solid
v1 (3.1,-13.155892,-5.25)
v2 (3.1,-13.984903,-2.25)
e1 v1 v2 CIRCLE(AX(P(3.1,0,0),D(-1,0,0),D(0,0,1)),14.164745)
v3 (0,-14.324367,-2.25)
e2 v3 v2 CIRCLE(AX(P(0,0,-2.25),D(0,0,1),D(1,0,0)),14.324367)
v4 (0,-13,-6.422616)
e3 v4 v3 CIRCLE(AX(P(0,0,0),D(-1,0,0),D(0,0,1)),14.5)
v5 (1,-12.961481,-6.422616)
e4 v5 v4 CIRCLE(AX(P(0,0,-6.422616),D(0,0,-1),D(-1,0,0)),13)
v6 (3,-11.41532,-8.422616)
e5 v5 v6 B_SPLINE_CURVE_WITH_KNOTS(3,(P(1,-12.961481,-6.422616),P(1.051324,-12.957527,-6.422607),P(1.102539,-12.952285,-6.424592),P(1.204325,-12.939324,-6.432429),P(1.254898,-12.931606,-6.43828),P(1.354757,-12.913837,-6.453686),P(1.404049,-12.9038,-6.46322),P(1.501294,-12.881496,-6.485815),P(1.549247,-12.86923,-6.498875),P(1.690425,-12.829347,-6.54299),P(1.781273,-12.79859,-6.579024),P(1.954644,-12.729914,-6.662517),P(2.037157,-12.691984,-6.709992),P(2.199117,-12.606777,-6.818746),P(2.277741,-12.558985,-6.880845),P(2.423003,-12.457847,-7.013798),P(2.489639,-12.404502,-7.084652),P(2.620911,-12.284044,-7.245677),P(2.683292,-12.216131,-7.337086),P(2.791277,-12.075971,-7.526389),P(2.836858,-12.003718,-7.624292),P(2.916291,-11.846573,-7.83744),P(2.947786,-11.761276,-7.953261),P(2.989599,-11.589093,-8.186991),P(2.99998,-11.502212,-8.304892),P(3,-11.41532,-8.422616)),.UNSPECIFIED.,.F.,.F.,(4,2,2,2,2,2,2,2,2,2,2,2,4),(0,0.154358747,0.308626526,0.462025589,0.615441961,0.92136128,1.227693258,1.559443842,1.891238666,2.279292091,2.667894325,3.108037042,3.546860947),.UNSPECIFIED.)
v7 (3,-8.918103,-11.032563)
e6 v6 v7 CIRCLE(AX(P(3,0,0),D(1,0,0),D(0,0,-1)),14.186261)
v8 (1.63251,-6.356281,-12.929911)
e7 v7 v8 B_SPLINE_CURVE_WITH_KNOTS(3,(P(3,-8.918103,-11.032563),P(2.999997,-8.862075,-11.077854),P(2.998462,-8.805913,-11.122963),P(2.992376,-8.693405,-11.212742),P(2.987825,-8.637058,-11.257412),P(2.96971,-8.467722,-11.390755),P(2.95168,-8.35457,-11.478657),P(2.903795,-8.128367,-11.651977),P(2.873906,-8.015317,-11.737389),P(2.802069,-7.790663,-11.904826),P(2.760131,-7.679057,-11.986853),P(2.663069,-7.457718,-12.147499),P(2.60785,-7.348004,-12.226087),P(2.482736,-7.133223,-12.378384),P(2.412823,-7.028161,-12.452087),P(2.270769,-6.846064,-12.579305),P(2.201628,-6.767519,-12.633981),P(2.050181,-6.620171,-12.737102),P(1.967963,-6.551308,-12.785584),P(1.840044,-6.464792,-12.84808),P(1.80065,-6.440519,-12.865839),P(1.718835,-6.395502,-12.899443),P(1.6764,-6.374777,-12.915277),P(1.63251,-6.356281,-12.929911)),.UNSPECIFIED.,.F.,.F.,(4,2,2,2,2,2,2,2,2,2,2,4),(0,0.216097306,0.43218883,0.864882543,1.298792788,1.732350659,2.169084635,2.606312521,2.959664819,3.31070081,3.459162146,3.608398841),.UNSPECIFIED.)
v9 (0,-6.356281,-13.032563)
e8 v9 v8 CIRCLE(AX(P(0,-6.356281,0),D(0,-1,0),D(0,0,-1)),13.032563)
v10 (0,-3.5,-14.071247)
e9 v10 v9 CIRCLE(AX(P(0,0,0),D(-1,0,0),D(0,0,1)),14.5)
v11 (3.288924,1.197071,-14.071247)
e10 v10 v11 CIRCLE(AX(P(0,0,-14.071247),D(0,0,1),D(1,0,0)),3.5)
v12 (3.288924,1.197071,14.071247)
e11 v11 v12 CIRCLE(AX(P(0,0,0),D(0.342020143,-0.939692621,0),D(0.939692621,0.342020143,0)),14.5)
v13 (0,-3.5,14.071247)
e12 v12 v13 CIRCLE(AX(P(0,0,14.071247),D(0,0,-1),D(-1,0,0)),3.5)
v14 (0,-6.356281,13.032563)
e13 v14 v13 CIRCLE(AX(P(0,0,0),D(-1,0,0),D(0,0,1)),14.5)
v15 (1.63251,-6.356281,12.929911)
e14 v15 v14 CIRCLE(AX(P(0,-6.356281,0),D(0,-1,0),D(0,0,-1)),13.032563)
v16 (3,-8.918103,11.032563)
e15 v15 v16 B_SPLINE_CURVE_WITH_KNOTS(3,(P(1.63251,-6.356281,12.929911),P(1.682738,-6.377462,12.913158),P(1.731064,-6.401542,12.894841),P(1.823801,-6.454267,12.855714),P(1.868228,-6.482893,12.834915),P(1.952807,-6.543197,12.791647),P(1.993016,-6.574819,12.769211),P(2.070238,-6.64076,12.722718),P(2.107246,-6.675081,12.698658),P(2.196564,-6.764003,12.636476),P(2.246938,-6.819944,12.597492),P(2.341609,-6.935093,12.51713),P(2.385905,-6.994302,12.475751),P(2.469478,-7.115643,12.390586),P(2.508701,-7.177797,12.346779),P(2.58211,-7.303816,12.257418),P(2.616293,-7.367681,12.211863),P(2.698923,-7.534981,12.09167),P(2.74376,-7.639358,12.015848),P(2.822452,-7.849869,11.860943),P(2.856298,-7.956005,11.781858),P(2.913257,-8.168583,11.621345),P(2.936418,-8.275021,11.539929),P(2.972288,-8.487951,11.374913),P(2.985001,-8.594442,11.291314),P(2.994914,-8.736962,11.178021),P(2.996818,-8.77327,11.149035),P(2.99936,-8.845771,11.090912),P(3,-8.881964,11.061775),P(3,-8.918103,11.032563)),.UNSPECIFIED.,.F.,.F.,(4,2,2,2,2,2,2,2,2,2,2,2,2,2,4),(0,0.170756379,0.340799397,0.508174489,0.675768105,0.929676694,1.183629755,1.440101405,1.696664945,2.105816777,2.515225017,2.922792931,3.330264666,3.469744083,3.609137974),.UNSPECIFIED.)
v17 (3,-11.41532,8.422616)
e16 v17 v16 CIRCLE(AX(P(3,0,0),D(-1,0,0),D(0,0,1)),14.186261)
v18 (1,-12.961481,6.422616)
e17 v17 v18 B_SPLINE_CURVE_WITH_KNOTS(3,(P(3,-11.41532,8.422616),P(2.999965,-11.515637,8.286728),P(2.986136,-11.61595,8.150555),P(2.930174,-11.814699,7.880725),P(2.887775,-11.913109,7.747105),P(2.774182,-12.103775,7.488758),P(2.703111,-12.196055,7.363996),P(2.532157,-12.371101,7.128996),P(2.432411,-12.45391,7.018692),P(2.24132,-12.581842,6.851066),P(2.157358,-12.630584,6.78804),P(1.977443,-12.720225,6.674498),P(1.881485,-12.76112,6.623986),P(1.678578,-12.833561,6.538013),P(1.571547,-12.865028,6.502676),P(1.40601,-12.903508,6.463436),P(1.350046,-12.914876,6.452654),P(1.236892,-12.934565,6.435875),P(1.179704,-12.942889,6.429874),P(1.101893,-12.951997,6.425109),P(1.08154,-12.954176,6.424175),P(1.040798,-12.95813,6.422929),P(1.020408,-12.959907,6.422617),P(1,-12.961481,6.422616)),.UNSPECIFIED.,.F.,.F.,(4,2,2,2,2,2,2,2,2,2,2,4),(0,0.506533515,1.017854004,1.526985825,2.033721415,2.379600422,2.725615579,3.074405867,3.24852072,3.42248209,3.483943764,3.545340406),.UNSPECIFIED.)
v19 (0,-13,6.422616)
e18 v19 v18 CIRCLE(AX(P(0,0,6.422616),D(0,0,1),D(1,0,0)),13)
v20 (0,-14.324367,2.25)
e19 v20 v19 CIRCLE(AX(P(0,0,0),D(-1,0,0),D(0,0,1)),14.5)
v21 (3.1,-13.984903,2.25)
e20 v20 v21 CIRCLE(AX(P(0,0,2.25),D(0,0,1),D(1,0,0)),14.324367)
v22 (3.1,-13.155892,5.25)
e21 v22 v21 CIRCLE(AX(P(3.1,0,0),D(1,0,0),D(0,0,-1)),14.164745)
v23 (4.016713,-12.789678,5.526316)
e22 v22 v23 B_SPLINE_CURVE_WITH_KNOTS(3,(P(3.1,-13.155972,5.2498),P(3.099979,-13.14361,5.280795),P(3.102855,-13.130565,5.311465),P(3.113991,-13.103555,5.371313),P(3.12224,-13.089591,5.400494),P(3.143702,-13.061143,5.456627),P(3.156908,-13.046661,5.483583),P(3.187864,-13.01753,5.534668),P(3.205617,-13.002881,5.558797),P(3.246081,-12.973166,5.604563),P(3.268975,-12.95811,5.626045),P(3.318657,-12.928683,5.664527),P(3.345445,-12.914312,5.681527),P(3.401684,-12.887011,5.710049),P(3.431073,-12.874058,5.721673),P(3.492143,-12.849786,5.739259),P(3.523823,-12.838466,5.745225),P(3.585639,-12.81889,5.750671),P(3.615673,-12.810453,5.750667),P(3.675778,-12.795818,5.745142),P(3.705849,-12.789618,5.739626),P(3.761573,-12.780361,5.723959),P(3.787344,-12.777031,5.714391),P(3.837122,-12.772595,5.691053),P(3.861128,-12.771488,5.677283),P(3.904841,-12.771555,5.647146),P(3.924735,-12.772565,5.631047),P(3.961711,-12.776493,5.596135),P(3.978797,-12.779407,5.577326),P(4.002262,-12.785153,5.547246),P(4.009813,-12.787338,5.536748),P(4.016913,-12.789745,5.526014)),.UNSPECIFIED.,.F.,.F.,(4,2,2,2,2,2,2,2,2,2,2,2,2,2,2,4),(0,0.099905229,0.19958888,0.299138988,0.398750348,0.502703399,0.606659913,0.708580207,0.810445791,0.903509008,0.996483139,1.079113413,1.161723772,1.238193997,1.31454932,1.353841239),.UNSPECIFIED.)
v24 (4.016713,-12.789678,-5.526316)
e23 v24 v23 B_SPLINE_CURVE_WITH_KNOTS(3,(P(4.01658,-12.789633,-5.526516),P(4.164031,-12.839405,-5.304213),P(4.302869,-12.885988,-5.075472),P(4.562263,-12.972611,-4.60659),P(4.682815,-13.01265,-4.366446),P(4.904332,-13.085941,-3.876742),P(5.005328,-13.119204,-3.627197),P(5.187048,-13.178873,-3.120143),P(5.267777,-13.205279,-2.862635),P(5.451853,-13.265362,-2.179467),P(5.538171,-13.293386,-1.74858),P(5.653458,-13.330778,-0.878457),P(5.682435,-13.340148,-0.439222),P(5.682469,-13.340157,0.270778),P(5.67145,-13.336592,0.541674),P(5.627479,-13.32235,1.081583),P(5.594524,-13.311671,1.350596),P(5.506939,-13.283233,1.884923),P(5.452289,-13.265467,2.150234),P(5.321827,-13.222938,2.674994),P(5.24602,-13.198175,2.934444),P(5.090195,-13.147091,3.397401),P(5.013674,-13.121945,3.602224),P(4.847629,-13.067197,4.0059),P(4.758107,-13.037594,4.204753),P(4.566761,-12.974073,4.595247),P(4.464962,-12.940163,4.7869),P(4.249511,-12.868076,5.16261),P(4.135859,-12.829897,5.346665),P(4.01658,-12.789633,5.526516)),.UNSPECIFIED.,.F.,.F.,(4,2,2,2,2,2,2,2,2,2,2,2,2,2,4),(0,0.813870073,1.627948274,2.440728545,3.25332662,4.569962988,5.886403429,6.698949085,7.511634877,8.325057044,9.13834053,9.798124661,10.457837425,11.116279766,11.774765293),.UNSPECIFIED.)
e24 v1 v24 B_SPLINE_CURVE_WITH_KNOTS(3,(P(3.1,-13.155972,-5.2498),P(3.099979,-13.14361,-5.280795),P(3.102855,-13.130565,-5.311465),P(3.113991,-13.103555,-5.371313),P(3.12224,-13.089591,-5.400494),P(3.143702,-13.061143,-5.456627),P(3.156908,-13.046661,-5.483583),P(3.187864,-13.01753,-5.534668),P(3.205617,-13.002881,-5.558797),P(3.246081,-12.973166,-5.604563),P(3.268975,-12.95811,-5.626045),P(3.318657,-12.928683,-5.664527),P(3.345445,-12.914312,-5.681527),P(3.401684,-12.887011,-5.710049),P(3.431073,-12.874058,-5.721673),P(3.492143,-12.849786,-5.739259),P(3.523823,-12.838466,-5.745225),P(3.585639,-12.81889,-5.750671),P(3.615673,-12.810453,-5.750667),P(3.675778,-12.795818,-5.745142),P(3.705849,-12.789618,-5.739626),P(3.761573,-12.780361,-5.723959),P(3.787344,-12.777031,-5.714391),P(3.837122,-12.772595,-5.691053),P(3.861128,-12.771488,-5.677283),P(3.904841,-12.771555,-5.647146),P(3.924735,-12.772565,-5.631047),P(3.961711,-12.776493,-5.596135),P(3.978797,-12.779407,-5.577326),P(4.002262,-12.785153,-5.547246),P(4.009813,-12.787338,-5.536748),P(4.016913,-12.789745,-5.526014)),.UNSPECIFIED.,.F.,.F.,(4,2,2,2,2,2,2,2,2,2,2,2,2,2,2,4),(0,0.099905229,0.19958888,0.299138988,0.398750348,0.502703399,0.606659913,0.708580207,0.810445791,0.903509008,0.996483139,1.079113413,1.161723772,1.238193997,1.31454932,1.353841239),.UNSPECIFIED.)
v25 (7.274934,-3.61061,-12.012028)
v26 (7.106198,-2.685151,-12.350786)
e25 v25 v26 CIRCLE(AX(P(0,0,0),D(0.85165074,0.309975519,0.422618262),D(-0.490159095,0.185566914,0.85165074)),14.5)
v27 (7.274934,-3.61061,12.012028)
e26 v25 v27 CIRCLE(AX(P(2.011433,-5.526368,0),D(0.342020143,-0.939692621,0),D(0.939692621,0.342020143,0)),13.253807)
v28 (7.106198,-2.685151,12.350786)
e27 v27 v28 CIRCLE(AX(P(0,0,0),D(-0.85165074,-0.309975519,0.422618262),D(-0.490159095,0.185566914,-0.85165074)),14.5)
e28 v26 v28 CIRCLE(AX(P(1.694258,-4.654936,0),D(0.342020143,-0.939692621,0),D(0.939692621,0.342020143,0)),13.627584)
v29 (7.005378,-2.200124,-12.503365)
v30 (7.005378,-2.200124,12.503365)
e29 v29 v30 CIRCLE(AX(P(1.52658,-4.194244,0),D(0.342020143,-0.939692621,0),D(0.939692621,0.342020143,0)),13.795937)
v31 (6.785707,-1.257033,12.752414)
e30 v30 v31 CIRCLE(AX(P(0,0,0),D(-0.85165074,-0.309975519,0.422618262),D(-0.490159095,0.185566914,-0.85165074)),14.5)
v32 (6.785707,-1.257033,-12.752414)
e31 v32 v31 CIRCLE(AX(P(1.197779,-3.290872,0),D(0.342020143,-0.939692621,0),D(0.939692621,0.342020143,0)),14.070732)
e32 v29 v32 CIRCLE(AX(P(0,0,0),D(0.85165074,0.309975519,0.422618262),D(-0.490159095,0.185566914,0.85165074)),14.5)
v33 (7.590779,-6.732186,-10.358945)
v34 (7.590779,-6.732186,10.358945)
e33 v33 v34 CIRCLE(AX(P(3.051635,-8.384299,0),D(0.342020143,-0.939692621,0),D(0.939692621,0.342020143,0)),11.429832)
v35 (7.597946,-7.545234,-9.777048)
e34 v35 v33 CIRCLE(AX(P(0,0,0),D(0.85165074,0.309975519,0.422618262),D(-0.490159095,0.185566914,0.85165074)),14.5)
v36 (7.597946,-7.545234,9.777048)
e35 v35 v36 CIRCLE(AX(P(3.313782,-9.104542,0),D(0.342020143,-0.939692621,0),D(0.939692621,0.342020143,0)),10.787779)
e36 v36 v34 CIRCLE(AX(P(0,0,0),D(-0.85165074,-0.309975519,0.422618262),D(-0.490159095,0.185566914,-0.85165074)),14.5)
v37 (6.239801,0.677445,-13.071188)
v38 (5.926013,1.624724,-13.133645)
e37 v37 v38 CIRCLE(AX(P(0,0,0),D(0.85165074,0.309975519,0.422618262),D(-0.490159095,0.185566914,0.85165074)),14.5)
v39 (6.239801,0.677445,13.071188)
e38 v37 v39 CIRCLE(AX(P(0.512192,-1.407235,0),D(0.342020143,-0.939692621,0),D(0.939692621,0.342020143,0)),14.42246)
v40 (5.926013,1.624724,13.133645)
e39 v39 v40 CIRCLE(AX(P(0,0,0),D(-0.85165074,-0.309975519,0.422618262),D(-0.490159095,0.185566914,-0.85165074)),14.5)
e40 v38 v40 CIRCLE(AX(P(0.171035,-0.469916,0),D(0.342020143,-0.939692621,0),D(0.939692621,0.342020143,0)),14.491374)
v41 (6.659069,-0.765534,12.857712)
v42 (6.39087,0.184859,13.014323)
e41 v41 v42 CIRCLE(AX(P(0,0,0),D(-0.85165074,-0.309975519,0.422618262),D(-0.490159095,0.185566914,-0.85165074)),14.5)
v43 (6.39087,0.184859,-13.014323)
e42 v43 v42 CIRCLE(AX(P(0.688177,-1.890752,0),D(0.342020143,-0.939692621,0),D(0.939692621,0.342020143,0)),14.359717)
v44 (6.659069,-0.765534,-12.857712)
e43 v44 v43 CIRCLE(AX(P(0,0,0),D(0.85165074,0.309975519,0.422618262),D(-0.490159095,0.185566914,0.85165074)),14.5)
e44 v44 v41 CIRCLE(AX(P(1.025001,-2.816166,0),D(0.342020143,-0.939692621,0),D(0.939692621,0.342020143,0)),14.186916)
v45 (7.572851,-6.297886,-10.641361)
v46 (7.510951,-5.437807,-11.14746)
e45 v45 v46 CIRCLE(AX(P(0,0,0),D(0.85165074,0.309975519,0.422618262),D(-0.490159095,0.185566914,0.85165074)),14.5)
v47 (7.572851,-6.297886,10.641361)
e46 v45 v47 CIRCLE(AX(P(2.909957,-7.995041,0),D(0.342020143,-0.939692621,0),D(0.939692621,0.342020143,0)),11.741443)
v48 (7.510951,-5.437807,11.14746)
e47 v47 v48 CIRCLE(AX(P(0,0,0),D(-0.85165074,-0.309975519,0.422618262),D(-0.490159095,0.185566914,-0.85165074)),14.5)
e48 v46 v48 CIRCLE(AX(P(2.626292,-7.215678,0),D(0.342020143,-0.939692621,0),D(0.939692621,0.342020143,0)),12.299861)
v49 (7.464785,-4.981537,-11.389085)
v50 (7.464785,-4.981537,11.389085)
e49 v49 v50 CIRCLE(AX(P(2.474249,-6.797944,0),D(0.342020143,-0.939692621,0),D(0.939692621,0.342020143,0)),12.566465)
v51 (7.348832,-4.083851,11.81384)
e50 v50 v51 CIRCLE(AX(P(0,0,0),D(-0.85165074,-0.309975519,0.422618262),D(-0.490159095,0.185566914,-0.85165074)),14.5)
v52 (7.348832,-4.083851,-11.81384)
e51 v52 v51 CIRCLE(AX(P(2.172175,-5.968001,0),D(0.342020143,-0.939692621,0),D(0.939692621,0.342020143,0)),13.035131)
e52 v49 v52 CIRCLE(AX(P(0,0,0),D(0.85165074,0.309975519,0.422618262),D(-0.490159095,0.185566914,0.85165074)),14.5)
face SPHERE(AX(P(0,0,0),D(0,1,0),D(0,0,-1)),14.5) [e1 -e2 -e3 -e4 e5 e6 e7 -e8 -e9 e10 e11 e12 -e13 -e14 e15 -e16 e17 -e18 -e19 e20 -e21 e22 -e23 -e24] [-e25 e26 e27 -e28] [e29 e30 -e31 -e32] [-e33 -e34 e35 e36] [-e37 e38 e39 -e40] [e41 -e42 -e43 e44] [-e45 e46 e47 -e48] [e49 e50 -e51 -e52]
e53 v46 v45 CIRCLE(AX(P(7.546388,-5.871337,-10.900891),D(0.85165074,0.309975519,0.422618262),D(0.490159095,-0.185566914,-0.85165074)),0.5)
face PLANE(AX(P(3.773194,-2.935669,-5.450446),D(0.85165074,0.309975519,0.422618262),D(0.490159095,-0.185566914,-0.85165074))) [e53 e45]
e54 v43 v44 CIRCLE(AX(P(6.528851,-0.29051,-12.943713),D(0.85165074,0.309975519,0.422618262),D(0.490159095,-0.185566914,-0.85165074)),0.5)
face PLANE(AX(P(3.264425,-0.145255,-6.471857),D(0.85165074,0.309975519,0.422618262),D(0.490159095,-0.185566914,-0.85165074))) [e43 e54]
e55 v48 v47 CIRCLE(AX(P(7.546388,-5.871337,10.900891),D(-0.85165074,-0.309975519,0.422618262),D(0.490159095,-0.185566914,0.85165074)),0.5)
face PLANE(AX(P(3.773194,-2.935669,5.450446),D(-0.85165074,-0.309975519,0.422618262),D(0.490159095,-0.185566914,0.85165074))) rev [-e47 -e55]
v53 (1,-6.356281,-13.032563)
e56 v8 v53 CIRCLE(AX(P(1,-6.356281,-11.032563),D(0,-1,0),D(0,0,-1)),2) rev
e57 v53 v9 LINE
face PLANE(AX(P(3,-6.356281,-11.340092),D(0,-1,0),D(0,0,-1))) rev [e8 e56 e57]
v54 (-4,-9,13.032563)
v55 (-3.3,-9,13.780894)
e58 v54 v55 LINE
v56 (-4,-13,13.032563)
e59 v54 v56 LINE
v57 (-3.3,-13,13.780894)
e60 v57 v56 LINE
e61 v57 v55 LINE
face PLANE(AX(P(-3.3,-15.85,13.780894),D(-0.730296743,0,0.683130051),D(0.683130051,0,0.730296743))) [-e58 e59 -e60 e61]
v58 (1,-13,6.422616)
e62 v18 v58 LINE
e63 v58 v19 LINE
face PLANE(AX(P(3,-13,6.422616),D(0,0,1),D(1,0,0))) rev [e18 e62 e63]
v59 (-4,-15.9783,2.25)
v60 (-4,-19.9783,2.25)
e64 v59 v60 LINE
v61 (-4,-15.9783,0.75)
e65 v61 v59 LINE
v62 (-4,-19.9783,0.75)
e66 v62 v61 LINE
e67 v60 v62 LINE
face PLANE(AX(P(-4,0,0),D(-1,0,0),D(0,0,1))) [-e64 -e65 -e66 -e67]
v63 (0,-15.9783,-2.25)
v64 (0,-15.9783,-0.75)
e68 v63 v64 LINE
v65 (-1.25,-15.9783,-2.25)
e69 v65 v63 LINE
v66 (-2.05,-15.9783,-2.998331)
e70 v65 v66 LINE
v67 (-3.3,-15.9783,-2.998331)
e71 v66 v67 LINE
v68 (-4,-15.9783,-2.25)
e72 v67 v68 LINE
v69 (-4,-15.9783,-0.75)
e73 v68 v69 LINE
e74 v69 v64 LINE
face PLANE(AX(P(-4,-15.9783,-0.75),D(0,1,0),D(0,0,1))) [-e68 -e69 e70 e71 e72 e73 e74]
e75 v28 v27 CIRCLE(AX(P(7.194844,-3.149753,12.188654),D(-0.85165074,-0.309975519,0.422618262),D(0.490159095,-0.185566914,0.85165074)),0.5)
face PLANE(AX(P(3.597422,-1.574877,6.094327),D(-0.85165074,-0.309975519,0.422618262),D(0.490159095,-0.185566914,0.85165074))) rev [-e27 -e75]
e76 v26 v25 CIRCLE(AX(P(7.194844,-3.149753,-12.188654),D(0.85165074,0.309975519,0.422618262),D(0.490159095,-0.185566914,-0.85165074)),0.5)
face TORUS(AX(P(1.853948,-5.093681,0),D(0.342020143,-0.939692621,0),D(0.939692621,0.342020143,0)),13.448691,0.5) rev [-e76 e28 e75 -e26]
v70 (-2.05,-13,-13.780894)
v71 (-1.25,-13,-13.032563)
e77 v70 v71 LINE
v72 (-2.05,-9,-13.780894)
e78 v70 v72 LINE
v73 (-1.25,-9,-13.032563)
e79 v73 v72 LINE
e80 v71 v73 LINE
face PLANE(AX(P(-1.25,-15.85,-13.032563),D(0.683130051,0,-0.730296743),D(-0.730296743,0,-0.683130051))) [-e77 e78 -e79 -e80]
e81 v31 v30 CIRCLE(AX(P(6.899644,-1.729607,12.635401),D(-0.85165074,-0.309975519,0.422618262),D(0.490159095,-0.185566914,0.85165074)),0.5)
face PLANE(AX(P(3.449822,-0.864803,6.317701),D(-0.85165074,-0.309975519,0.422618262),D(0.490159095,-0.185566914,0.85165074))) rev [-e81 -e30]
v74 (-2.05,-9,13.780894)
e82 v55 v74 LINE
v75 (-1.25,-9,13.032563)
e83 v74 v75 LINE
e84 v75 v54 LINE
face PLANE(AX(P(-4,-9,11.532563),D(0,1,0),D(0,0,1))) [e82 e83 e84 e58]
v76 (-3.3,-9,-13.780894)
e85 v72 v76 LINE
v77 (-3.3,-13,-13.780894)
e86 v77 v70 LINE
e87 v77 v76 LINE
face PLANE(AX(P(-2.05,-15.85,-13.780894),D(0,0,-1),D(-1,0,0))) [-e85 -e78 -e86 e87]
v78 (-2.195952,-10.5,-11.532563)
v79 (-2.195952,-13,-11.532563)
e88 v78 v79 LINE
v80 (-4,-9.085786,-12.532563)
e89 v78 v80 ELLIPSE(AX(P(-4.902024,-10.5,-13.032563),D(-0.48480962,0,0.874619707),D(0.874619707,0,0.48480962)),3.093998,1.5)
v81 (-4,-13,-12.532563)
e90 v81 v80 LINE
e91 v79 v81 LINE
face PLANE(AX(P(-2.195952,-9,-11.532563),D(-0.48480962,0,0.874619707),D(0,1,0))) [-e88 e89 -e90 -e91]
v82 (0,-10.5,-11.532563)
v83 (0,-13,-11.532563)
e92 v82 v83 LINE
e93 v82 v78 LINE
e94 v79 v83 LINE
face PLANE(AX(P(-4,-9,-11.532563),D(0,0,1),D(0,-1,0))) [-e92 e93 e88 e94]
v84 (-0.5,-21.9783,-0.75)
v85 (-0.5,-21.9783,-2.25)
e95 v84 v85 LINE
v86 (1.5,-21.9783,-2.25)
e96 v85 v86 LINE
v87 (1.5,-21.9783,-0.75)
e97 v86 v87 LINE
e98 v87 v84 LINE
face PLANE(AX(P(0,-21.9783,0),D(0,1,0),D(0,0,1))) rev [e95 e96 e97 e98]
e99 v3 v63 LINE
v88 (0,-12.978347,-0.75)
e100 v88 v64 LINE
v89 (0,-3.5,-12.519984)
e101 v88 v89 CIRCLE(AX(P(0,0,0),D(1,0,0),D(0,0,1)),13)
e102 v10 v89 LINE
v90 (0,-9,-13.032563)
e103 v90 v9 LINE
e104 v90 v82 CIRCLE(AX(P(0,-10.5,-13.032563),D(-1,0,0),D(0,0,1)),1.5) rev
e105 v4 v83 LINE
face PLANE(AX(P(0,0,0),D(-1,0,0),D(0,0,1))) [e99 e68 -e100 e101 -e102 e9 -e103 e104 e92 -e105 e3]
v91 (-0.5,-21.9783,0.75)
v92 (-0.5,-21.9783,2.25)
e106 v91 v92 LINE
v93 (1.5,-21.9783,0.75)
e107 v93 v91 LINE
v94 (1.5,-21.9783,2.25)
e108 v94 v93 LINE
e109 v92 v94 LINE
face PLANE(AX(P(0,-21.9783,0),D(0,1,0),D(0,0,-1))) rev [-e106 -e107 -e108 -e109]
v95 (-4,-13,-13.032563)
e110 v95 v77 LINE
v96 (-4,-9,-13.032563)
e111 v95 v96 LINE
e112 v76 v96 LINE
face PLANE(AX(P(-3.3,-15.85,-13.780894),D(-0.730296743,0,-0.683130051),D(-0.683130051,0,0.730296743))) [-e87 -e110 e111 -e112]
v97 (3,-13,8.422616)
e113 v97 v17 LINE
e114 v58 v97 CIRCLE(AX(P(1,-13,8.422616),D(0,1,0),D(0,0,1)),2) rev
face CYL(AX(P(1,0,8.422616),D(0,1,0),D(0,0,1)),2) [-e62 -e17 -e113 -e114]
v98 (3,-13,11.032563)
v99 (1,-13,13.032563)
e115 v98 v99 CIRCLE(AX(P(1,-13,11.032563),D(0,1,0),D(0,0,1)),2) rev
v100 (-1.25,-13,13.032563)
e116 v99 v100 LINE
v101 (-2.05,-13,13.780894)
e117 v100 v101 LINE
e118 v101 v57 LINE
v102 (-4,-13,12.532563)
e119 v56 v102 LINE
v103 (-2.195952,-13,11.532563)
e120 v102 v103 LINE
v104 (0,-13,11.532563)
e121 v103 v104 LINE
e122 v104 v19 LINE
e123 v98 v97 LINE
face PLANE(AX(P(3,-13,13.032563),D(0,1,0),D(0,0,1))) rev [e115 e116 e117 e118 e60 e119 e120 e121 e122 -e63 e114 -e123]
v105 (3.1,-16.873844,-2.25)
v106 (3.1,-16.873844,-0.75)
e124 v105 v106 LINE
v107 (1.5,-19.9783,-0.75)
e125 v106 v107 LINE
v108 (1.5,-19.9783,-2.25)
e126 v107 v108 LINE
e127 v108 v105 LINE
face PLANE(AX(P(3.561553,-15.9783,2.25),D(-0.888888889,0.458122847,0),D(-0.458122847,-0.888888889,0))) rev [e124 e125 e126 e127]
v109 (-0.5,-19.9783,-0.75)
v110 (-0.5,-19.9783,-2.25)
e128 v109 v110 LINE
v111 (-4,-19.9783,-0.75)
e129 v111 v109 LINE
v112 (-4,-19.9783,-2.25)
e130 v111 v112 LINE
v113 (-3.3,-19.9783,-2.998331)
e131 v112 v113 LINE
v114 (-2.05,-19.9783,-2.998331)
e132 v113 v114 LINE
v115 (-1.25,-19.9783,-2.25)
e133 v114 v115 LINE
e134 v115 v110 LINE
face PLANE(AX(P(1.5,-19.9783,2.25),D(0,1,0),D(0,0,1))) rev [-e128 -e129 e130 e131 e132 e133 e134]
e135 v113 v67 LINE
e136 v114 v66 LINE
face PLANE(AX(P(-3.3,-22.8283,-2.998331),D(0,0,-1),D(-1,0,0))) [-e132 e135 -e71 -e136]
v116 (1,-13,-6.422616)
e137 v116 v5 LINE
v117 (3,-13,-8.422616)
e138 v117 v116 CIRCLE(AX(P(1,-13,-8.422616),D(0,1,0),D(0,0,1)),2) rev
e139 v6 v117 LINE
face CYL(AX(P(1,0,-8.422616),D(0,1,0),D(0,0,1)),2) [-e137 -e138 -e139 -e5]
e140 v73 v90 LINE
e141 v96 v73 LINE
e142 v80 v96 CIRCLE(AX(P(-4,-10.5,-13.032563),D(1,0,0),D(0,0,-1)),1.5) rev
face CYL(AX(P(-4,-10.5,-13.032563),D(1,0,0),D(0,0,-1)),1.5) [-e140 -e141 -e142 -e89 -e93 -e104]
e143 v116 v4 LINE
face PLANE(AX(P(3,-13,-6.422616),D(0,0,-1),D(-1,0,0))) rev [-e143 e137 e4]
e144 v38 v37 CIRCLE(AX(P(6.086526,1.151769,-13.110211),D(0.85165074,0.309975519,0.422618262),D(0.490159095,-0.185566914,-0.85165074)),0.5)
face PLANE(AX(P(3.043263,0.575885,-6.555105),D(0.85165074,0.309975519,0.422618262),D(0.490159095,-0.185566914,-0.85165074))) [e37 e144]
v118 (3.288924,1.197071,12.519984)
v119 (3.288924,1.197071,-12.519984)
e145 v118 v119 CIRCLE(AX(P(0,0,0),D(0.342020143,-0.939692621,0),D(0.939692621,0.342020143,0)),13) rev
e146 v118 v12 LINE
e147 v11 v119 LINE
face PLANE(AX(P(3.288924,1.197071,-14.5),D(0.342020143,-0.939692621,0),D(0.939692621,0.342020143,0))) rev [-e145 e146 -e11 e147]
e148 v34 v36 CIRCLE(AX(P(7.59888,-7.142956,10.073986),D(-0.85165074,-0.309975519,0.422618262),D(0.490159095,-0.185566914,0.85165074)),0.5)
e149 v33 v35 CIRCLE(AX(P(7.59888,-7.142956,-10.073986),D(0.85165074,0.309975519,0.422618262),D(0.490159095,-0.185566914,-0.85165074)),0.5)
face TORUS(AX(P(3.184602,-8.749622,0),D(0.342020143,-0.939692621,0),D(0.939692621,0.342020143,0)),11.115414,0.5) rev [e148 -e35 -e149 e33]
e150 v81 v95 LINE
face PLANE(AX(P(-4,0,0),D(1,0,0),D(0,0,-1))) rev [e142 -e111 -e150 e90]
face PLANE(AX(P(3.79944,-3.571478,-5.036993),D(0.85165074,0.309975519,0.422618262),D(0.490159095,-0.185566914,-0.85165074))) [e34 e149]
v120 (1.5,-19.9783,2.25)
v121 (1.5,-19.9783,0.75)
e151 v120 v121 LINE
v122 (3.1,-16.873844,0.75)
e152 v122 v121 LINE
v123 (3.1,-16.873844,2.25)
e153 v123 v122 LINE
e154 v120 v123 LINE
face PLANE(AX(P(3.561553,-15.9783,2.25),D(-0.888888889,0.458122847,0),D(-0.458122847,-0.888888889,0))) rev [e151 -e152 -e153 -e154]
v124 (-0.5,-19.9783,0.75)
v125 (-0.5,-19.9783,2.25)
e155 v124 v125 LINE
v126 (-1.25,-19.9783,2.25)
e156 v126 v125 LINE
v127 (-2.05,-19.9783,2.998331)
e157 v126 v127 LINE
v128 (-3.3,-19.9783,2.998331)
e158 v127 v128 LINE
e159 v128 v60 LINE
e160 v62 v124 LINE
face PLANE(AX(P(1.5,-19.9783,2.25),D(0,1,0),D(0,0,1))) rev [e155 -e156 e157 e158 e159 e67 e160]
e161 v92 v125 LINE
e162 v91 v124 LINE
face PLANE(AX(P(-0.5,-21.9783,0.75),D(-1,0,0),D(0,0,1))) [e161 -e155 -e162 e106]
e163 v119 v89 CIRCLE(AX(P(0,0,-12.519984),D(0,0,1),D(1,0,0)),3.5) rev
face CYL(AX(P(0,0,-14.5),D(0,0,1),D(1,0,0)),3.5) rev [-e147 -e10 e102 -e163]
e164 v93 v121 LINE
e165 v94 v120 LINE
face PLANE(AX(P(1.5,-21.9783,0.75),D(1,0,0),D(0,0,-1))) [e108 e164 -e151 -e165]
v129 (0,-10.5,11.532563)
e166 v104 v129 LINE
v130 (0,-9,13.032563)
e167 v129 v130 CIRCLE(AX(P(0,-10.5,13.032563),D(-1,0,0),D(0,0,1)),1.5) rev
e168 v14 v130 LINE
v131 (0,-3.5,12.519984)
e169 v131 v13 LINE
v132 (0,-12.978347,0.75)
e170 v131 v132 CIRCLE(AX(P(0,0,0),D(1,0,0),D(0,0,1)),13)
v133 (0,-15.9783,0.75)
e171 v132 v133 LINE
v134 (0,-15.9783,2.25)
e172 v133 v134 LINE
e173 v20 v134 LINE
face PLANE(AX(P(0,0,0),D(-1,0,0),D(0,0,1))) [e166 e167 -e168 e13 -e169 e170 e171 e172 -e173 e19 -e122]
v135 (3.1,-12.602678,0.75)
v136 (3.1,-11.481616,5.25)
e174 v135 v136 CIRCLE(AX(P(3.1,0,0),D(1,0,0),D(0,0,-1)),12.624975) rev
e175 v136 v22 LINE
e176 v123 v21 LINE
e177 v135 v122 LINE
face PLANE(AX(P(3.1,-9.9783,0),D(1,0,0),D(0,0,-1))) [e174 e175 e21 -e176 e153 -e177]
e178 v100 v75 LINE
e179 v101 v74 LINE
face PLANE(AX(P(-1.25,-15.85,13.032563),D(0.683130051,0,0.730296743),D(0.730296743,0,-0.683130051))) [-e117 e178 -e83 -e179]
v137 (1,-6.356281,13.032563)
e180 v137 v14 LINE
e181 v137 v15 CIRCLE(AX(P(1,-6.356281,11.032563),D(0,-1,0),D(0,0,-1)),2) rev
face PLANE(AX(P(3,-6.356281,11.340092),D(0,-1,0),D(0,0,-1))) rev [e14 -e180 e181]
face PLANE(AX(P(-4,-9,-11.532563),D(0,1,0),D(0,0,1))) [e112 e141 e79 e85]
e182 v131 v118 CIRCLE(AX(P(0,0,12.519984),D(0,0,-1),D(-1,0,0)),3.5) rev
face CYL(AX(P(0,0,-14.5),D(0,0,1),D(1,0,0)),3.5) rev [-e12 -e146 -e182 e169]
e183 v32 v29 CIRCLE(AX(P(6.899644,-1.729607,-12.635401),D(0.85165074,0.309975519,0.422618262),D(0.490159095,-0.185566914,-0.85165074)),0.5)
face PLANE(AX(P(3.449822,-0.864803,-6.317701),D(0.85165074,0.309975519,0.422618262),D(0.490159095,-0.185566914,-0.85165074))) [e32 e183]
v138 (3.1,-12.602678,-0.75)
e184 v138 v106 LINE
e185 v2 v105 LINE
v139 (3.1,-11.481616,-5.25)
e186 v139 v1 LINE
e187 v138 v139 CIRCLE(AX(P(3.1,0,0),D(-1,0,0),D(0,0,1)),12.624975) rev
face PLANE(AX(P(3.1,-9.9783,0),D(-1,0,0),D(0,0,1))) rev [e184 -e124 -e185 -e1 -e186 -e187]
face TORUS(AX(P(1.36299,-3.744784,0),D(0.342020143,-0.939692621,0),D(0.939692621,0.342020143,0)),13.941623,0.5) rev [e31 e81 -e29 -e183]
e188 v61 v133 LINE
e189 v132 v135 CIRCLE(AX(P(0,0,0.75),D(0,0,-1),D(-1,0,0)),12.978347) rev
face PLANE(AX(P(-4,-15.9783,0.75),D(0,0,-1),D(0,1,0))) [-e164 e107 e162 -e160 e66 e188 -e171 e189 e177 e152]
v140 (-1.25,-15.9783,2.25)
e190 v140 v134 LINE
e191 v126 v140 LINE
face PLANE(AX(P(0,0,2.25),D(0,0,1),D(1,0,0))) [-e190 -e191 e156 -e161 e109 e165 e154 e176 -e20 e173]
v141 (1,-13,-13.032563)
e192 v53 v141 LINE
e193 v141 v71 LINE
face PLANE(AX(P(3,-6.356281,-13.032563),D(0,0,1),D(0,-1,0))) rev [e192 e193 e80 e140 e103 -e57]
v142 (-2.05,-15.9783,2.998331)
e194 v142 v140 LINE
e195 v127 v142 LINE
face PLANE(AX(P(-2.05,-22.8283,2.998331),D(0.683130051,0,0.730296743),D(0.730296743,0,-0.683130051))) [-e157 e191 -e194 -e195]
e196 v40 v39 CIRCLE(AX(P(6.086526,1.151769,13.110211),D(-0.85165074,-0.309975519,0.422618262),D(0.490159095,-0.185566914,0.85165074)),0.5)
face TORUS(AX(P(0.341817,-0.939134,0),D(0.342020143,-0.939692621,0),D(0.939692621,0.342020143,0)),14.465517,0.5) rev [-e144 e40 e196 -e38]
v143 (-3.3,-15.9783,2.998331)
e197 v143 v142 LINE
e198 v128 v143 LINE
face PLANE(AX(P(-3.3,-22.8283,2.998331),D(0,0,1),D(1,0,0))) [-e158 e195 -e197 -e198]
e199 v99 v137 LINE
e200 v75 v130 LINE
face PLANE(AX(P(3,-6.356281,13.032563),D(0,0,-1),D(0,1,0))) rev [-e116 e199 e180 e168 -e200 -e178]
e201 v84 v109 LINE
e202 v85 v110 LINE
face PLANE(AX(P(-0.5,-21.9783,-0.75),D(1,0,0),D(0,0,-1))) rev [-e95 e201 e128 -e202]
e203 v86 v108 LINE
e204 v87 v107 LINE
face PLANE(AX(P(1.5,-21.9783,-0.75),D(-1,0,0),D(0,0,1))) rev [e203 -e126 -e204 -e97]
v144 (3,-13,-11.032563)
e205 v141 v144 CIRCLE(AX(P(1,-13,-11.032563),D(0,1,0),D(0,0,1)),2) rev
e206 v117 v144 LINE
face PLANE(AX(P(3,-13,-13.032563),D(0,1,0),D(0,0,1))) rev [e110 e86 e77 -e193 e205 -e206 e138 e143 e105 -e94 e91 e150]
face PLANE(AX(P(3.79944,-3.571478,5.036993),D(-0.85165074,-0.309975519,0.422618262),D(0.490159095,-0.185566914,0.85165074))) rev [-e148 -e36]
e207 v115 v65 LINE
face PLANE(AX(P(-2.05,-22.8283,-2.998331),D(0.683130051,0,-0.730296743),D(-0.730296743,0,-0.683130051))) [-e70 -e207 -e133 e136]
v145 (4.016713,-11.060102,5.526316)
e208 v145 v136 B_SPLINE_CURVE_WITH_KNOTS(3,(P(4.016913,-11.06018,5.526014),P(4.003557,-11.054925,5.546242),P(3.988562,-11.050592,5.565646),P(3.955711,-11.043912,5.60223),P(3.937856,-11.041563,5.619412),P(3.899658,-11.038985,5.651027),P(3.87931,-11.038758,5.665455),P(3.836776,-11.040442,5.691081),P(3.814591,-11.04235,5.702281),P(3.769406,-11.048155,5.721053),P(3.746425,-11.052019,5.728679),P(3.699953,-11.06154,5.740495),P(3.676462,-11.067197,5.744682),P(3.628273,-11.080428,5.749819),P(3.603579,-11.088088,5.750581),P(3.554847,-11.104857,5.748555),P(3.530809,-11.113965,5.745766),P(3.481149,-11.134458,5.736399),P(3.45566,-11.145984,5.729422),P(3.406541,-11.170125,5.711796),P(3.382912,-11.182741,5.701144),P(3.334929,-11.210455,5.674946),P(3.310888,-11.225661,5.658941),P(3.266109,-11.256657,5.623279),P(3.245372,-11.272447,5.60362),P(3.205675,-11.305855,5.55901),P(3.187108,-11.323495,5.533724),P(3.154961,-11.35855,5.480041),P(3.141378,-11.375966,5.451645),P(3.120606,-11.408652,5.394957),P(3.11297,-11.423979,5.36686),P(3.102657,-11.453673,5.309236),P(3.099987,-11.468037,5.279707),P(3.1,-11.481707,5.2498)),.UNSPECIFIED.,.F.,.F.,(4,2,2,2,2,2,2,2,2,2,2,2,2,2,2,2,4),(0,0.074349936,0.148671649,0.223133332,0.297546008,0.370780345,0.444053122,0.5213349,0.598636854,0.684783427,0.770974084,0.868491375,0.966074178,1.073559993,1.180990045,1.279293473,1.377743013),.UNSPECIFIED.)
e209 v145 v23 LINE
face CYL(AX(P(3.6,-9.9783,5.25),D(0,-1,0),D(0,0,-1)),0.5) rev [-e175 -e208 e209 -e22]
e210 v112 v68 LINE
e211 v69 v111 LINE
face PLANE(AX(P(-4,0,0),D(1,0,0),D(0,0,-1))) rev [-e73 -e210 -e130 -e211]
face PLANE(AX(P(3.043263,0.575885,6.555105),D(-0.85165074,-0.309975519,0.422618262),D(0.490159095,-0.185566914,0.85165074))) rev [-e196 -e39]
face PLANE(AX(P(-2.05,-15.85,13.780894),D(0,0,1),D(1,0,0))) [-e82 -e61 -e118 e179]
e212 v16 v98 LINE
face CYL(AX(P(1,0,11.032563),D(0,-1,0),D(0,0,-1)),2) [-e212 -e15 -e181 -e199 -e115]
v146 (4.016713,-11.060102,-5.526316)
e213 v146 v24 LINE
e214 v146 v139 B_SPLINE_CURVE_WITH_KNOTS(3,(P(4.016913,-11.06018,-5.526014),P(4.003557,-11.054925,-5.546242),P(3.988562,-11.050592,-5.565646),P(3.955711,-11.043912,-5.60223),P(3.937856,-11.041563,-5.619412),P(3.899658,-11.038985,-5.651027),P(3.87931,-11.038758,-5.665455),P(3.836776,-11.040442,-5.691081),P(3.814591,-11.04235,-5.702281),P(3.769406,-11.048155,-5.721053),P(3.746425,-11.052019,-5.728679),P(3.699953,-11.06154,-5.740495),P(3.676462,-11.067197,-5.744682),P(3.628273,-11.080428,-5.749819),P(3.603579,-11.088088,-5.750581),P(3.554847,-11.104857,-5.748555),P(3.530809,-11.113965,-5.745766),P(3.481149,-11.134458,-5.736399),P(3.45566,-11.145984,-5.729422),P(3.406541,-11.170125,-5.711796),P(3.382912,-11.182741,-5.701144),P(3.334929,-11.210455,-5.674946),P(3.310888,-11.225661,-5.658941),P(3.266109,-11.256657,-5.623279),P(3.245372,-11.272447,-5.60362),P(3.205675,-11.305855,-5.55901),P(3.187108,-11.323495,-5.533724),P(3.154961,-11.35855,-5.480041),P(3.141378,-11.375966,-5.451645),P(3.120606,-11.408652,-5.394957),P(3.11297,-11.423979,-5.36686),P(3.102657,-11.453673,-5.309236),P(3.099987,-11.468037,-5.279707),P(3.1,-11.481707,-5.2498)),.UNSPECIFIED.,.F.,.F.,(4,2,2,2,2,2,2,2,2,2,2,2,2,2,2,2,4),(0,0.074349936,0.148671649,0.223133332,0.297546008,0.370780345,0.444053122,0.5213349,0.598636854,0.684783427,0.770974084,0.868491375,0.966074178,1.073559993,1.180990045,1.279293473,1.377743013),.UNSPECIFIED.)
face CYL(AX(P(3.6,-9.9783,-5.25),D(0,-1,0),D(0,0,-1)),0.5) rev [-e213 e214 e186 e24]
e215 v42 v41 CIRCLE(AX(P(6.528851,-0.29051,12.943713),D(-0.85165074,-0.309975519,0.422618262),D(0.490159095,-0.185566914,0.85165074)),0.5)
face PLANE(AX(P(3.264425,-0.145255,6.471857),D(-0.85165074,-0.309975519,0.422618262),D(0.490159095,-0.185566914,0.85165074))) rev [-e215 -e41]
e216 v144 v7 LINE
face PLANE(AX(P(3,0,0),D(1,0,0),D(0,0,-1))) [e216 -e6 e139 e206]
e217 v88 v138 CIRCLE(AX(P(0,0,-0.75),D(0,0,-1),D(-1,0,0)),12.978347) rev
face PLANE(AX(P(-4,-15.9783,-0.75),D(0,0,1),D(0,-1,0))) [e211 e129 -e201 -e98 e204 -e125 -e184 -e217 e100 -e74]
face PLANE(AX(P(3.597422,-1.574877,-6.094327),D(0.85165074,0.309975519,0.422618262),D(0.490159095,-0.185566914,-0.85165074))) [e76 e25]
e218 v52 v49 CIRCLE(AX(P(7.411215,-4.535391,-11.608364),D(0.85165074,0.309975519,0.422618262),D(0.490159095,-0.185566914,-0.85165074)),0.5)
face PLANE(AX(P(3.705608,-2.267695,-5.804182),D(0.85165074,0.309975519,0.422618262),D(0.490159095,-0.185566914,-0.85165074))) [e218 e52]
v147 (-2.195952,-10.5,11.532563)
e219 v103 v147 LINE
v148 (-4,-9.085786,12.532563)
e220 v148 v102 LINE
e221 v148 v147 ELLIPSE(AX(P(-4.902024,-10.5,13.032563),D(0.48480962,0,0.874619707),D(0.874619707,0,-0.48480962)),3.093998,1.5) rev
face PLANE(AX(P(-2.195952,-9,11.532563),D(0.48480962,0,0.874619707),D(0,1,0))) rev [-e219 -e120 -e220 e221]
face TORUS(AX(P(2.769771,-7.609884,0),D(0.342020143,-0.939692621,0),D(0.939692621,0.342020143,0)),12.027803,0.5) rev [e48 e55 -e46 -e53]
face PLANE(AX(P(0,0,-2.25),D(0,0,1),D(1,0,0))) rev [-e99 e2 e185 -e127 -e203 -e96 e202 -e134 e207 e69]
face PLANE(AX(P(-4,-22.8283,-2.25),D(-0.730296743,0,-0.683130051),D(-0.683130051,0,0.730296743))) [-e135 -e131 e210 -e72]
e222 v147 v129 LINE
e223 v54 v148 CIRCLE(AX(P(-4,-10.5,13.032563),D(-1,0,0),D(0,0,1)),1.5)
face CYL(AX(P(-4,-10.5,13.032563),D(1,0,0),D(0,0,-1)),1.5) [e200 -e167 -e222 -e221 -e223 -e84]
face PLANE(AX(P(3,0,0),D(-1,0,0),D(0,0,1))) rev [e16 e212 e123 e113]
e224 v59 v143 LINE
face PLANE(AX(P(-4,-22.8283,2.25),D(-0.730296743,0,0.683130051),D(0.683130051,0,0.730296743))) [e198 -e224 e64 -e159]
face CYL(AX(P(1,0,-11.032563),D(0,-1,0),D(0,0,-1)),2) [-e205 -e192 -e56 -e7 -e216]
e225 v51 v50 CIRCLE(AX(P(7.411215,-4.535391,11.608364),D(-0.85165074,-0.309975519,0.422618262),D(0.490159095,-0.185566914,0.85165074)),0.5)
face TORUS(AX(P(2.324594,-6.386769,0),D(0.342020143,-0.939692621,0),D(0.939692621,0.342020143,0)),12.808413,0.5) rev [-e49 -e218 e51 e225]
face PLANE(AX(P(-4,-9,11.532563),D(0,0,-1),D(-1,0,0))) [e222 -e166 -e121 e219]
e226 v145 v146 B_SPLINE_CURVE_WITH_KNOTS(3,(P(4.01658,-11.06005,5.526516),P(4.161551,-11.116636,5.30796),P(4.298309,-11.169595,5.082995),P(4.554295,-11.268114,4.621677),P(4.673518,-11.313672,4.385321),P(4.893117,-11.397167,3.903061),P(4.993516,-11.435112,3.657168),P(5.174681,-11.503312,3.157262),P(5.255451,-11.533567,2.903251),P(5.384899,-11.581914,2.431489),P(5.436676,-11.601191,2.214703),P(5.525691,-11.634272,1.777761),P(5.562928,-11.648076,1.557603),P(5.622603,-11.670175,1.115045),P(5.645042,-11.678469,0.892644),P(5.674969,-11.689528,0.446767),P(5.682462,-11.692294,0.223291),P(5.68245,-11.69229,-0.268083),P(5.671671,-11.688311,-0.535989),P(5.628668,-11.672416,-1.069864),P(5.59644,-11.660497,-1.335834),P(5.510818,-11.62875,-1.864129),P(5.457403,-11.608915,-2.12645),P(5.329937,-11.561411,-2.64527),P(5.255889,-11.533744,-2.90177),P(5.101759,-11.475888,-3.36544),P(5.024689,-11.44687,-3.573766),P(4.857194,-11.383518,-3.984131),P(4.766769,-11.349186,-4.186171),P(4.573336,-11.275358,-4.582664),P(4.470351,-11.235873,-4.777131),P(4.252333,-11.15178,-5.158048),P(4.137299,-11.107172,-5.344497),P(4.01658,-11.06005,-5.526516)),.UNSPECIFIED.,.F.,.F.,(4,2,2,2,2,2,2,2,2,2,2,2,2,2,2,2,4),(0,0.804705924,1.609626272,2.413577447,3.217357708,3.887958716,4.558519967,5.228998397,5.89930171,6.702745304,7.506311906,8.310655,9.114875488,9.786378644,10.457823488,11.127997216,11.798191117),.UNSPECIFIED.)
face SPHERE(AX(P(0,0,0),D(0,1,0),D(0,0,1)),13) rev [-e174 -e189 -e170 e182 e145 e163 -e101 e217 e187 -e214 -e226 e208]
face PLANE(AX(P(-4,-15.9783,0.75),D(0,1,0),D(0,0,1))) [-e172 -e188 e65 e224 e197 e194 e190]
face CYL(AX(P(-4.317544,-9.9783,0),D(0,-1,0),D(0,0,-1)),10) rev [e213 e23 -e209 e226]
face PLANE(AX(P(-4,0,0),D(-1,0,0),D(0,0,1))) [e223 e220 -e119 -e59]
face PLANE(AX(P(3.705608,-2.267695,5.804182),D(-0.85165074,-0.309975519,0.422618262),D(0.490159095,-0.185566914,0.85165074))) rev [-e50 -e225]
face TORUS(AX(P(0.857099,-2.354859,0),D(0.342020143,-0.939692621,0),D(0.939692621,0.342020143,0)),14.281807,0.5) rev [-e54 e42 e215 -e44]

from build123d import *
from OCP.BRepFilletAPI import BRepFilletAPI_MakeChamfer

# Parameters (mm, degrees)
CUT_EXTRUDE1_DEPTH      = 26.114736710152698
CUT_EXTRUDE1_DEPTH_BACK = 26.114736710152698
BOSS_EXTRUDE1_DEPTH     = 4
BOSS_EXTRUDE1_2_DEPTH   = 4
BOSS_EXTRUDE1_3_DEPTH   = 4
BOSS_EXTRUDE1_4_DEPTH   = 4
BOSS_EXTRUDE2_DEPTH     = 2.25
BOSS_EXTRUDE3_DEPTH     = 3
BOSS_EXTRUDE4_DEPTH     = 4
BOSS_EXTRUDE5_DEPTH     = 4
CHAMFER1_SIZE           = 1
CHAMFER1_SIZE2          = 1.8040477552714331
FILLET1_R               = 2
FILLET2_R               = 2
FILLET3_R               = 1.5
CUT_EXTRUDE3_DEPTH      = 10
CUT_REVOLVE1_ANGLE      = 130.00000000000045
BOSS_EXTRUDE6_DEPTH     = 2


# Read off the part's stored shape, not the designer's step: Revolve1
with BuildPart() as part:
    # Revolve1 outline → Revolve1 (revolve)
    with BuildSketch(Plane.YX):
        with BuildLine():
            Line((13, -1.3e-08), (14.5, -1.1e-08))
            ThreePointArc((14.5, -1.1e-08), (10.253048331, 10.253048323), (0, 14.5))
            Line((0, 14.5), (0, 13))
            ThreePointArc((0, 13), (9.19238816, 9.192388151), (13, -1.3e-08))
        make_face()
    revolve(axis=Axis((0, 0, 0), (1, 0, 0)))

    # Sketch7 → Cut-Extrude1 (cut, two sides: drawn at the far end of the back side and taken through both)
    with BuildSketch(Plane.XY.offset(-CUT_EXTRUDE1_DEPTH_BACK)):
        with BuildLine():
            Line((3.288924172750674, 1.1970705016398546), (13.625543001395652, 4.959292078222255))
            ThreePointArc((13.625543001395652, 4.959292078222255), (8.316858327090143, 11.877704642190398), (-1.76e-15, 14.5))
            Line((-1.76e-15, 14.5), (-1.79e-15, -3.04e-15))
            Line((-1.79e-15, -3.04e-15), (-1.58e-15, -3.5))
            ThreePointArc((-1.58e-15, -3.5), (2.867032155011472, -2.0075175272286554), (3.288924172750674, 1.1970705016398546))
        make_face()
    extrude(amount=CUT_EXTRUDE1_DEPTH + CUT_EXTRUDE1_DEPTH_BACK, mode=Mode.SUBTRACT)



with BuildPart() as body_2:
    # Sketch2 → Boss-Extrude1 (new body)
    with BuildSketch(Plane(origin=(0, 0, 0), x_dir=(0, 0, -1), z_dir=(1, 0, 0))):
        Polygon((0.7500000000000001, -15.9783), (2.2499999999999996, -15.9783), (2.2500000000000013, -19.9783), (0.7500000000000009, -19.9783), align=None)
    extrude(amount=-BOSS_EXTRUDE1_DEPTH)


with BuildPart() as body_3:
    # Sketch2 → Boss-Extrude1 2 (new body)
    with BuildSketch(Plane(origin=(0, 0, 0), x_dir=(0, 0, -1), z_dir=(1, 0, 0))):
        Polygon((-0.75, -15.9783), (-2.2499999999999996, -15.9783), (-2.2499999999999996, -19.9783), (-0.7499999999999993, -19.9783), align=None)
    extrude(amount=-BOSS_EXTRUDE1_2_DEPTH)


with BuildPart() as body_4:
    # Sketch2 → Boss-Extrude1 3 (new body)
    with BuildSketch(Plane(origin=(0, 0, 0), x_dir=(0, 0, -1), z_dir=(1, 0, 0))):
        Polygon((-11.532562594670793, -9.000000000000002), (-13.032562594670793, -9.000000000000002), (-13.032562594670793, -13.000000000000004), (-11.532562594670793, -13.000000000000002), align=None)
    extrude(amount=-BOSS_EXTRUDE1_3_DEPTH)


with BuildPart() as body_5:
    # Sketch2 → Boss-Extrude1 4 (new body)
    with BuildSketch(Plane(origin=(0, 0, 0), x_dir=(0, 0, -1), z_dir=(1, 0, 0))):
        Polygon((11.532562594670795, -9.000000000000002), (13.032562594670791, -9.000000000000002), (13.032562594670791, -13.000000000000002), (11.532562594670791, -13.000000000000002), align=None)
    extrude(amount=-BOSS_EXTRUDE1_4_DEPTH)


with BuildPart() as part_1:
    add(part.part)

    add(body_2.part)  # Boss-Extrude2 merges body 2

    add(body_3.part)  # Boss-Extrude2 merges body 3
    # Sketch3 → Boss-Extrude2 (add, symmetric)
    with BuildSketch(Plane.XY):
        Polygon((3.5615528128088356, -15.978300000000004), (1.5, -19.9783), (0, -19.9783), (0, -15.9783), (-2.39e-15, -13), (3.5615528128088223, -13), align=None)
    extrude(amount=BOSS_EXTRUDE2_DEPTH, both=True)


    add(body_4.part)  # Boss-Extrude3 merges body 4

    add(body_5.part)  # Boss-Extrude3 merges body 5
    # Sketch4 → Boss-Extrude3 (add)
    with BuildSketch(Plane(origin=(0, 0, 0), x_dir=(0, 0, -1), z_dir=(1, 0, 0))):
        with BuildLine():
            Line((-6.4226162893325585, -13.000000000000004), (-6.4226162893325585, -11.302654555457316))
            ThreePointArc((-6.4226162893325585, -11.302654555457316), (-9.219278928727187, -9.165418486590061), (-11.340092053595173, -6.356281319764543))
            Line((-11.340092053595173, -6.356281319764543), (-13.032562594670793, -6.356281319764542))
            Line((-13.032562594670793, -6.356281319764542), (-13.032562594670791, -13.000000000000002))
            Line((-13.032562594670791, -13.000000000000002), (-6.4226162893325585, -13.000000000000004))
        make_face()
        with BuildLine():
            Line((11.340092053595173, -6.356281319764543), (13.032562594670793, -6.356281319764542))
            Line((13.032562594670793, -6.356281319764542), (13.032562594670791, -13.000000000000002))
            Line((13.032562594670791, -13.000000000000002), (6.4226162893325585, -13.000000000000004))
            Line((6.4226162893325585, -13.000000000000004), (6.4226162893325585, -11.302654555457316))
            ThreePointArc((6.4226162893325585, -11.302654555457316), (9.219278928727183, -9.165418486590065), (11.340092053595173, -6.356281319764543))
        make_face()
    extrude(amount=BOSS_EXTRUDE3_DEPTH)

    # Sketch5 → Boss-Extrude4 (add)
    with BuildSketch(Plane(origin=(0, -15.9783, 0), x_dir=(1, 0, 0), z_dir=(0, 1, 0))):
        Polygon((-4, -2.25), (-3.3, -2.9983314773547876), (-2.0499999999999963, -2.998331477354794), (-1.250000000000001, -2.2499999999999996), align=None)
        Polygon((-2.0499999999999963, 2.9983314773547933), (-1.250000000000001, 2.2499999999999996), (-4, 2.25), (-3.3000000000000007, 2.9983314773547867), align=None)
    extrude(amount=-BOSS_EXTRUDE4_DEPTH)

    # Sketch6 → Boss-Extrude5 (add)
    with BuildSketch(Plane(origin=(0, -9.000000000000002, 0), x_dir=(1, 0, 0), z_dir=(0, 1, 0))):
        Polygon((-1.2500000000000016, -13.032562594670793), (-2.05, -13.780894072025584), (-3.3000000000000034, -13.780894072025584), (-4, -13.032562594670795), align=None)
        Polygon((-1.2500000000000049, 13.032562594670793), (-2.0500000000000034, 13.780894072025584), (-3.300000000000007, 13.780894072025584), (-4, 13.032562594670795), align=None)
    extrude(amount=-BOSS_EXTRUDE5_DEPTH)

    # Chamfer1: one chamfer whose edges measure the first distance from different faces: ONE call of the kernel's chamfer builder (chamfer() names one face for all edges)
    chamfer1_edges_1 = [part_1.edges().sort_by_distance(p)[0] for p in [
        (-4, -11.000000000000002, 11.532562594670793),
    ]]
    chamfer1_side_1 = [part_1.faces().sort_by_distance(p)[0] for p in [
        (-4, -11.000000000000002, 12.282562594670795),
    ]]
    chamfer1_edges_2 = [part_1.edges().sort_by_distance(p)[0] for p in [
        (-4, -11.000000000000002, -11.532562594670793),
    ]]
    chamfer1_side_2 = [part_1.faces().sort_by_distance(p)[0] for p in [
        (-4, -11.000000000000004, -12.282562594670793),
    ]]
    chamfer1 = BRepFilletAPI_MakeChamfer(part_1.part.solid().wrapped)
    for e in chamfer1_edges_1:
        chamfer1.Add(CHAMFER1_SIZE, CHAMFER1_SIZE2, e.wrapped, chamfer1_side_1[0].wrapped)  # the first distance lies on this face
    for e in chamfer1_edges_2:
        chamfer1.Add(CHAMFER1_SIZE, CHAMFER1_SIZE2, e.wrapped, chamfer1_side_2[0].wrapped)  # the first distance lies on this face
    add(Compound.cast(chamfer1.Shape()), mode=Mode.REPLACE)

    # Fillet1
    fillet1_edges = [part_1.edges().sort_by_distance(p)[0] for p in [
        (3, -9.678140659882272, -13.032562594670793),
        (3, -9.678140659882272, 13.032562594670793),
    ]]
    fillet(fillet1_edges, radius=FILLET1_R)

    # Fillet2
    fillet2_edges = [part_1.edges().sort_by_distance(p)[0] for p in [
        (3, -12.824555321004684, -6.4226162893325585),
        (3, -12.824555321004684, 6.4226162893325585),
    ]]
    fillet(fillet2_edges, radius=FILLET2_R)

    # Fillet3
    fillet3_edges = [part_1.edges().sort_by_distance(p)[0] for p in [
        (-1.0979761223642828, -9.000000000000002, 11.532562594670793),
        (-1.097976122364282, -9.000000000000002, -11.532562594670795),
    ]]
    fillet(fillet3_edges, radius=FILLET3_R)

    # Sketch8 → Cut-Extrude3 (cut)
    with BuildSketch(Plane.XZ.offset(19.9783)):
        with BuildLine():
            Line((0, 0.7499999999999994), (3.1, 0.749999999999999))
            Line((3.1, 0.749999999999999), (3.0999999999999996, 5.25))
            ThreePointArc((3.0999999999999996, 5.25), (3.455702418732044, 5.728725608297927), (4.016712832160874, 5.526315789473686))
            ThreePointArc((4.016712832160874, 5.526315789473686), (5.256968354901936, 2.885951625359105), (5.682456188943444, 1e-17))
            Line((5.682456188943444, 1e-17), (0, 0))
            Line((0, 0), (0, 0.7499999999999994))
        make_face()
    cut_extrude3 = extrude(amount=-CUT_EXTRUDE3_DEPTH, mode=Mode.SUBTRACT)

    # Mirror1: Cut-Extrude3 across plane
    add(cut_extrude3.mirror(Plane.XY), mode=Mode.SUBTRACT)

    # Sketch9 → Cut-Revolve1 (revolve, symmetric, cut)
    with BuildSketch(Plane.XY) as cut_revolve1_sk:
        with BuildLine():
            ThreePointArc((13.788472874762384, 4.48642572455422), (13.93495654907324, 4.008364501319799), (14.06487071500232, 3.525537089617696))
            ThreePointArc((14.06487071500232, 3.525537089617696), (13.454440806001752, 3.870145035757048), (13.788472874762384, 4.48642572455422))
        make_face()
        with BuildLine():
            ThreePointArc((14.181897364194834, 3.020560734606002), (14.277607580598435, 2.529806667403268), (14.356340855764694, 2.0360445066602195))
            ThreePointArc((14.356340855764694, 2.0360445066602195), (13.785276284715724, 2.4425719547342415), (14.181897364194834, 3.020560734606002))
        make_face()
        with BuildLine():
            ThreePointArc((14.419942018352346, 1.5216018491564718), (14.463830155689108, 1.023531742242686), (14.490519921853823, 0.5242445940182665))
            ThreePointArc((14.490519921853823, 0.5242445940182665), (13.965077391699829, 0.9882375442343183), (14.419942018352346, 1.5216018491564718))
        make_face()
        with BuildLine():
            ThreePointArc((14.499998770189928, 0.00597197543192492), (14.49158398084301, -0.49395721087374367), (14.465937819342894, -0.9932990521010843))
            ThreePointArc((14.465937819342894, -0.9932990521010843), (13.99187418840015, -0.47692420360223536), (14.499998770189928, 0.00597197543192492))
        make_face()
        with BuildLine():
            ThreePointArc((14.421190501181444, -1.509723328505564), (14.360564979343833, -2.0060342654210404), (14.282863874891065, -2.4999599059448148))
            ThreePointArc((14.282863874891065, -2.4999599059448148), (13.865373083504398, -1.9368606700616913), (14.421190501181444, -1.509723328505564))
        make_face()
        with BuildLine():
            ThreePointArc((14.184380651213877, -3.00887778772573), (14.072208622789537, -3.496132788766427), (13.943303884944516, -3.9792306759084717))
            ThreePointArc((13.943303884944516, -3.9792306759084717), (13.586960049589903, -3.375576485705514), (14.184380651213877, -3.00887778772573))
        make_face()
        with BuildLine():
            ThreePointArc((13.792163758559106, -4.475066352255412), (13.62967420376496, -4.947926949665264), (13.450978139810571, -5.414904161879316))
            ThreePointArc((13.450978139810571, -5.414904161879316), (13.159685438117902, -4.777308778987149), (13.792163758559106, -4.475066352255412))
        make_face()
    revolve(axis=Axis((0, 0, 0), (-0.3420201433256728, 0.939692620785907, 0)), revolution_arc=CUT_REVOLVE1_ANGLE / 2, mode=Mode.SUBTRACT)
    revolve(cut_revolve1_sk.sketch, axis=Axis((0, 0, 0), (0.3420201433256728, -0.939692620785907, 0)), revolution_arc=CUT_REVOLVE1_ANGLE / 2, mode=Mode.SUBTRACT)

    # Sketch10 → Boss-Extrude6 (add)
    with BuildSketch(Plane.XZ.offset(19.9783)):
        Polygon((1.5, -0.7499999999999992), (-0.5, -0.7499999999999994), (-0.4999999999999998, -2.25), (1.5, -2.25), align=None)
    boss_extrude6 = extrude(amount=BOSS_EXTRUDE6_DEPTH)

    # Mirror2: Boss-Extrude6 across plane
    add(boss_extrude6.mirror(Plane.XY))


solid = part_1.part
